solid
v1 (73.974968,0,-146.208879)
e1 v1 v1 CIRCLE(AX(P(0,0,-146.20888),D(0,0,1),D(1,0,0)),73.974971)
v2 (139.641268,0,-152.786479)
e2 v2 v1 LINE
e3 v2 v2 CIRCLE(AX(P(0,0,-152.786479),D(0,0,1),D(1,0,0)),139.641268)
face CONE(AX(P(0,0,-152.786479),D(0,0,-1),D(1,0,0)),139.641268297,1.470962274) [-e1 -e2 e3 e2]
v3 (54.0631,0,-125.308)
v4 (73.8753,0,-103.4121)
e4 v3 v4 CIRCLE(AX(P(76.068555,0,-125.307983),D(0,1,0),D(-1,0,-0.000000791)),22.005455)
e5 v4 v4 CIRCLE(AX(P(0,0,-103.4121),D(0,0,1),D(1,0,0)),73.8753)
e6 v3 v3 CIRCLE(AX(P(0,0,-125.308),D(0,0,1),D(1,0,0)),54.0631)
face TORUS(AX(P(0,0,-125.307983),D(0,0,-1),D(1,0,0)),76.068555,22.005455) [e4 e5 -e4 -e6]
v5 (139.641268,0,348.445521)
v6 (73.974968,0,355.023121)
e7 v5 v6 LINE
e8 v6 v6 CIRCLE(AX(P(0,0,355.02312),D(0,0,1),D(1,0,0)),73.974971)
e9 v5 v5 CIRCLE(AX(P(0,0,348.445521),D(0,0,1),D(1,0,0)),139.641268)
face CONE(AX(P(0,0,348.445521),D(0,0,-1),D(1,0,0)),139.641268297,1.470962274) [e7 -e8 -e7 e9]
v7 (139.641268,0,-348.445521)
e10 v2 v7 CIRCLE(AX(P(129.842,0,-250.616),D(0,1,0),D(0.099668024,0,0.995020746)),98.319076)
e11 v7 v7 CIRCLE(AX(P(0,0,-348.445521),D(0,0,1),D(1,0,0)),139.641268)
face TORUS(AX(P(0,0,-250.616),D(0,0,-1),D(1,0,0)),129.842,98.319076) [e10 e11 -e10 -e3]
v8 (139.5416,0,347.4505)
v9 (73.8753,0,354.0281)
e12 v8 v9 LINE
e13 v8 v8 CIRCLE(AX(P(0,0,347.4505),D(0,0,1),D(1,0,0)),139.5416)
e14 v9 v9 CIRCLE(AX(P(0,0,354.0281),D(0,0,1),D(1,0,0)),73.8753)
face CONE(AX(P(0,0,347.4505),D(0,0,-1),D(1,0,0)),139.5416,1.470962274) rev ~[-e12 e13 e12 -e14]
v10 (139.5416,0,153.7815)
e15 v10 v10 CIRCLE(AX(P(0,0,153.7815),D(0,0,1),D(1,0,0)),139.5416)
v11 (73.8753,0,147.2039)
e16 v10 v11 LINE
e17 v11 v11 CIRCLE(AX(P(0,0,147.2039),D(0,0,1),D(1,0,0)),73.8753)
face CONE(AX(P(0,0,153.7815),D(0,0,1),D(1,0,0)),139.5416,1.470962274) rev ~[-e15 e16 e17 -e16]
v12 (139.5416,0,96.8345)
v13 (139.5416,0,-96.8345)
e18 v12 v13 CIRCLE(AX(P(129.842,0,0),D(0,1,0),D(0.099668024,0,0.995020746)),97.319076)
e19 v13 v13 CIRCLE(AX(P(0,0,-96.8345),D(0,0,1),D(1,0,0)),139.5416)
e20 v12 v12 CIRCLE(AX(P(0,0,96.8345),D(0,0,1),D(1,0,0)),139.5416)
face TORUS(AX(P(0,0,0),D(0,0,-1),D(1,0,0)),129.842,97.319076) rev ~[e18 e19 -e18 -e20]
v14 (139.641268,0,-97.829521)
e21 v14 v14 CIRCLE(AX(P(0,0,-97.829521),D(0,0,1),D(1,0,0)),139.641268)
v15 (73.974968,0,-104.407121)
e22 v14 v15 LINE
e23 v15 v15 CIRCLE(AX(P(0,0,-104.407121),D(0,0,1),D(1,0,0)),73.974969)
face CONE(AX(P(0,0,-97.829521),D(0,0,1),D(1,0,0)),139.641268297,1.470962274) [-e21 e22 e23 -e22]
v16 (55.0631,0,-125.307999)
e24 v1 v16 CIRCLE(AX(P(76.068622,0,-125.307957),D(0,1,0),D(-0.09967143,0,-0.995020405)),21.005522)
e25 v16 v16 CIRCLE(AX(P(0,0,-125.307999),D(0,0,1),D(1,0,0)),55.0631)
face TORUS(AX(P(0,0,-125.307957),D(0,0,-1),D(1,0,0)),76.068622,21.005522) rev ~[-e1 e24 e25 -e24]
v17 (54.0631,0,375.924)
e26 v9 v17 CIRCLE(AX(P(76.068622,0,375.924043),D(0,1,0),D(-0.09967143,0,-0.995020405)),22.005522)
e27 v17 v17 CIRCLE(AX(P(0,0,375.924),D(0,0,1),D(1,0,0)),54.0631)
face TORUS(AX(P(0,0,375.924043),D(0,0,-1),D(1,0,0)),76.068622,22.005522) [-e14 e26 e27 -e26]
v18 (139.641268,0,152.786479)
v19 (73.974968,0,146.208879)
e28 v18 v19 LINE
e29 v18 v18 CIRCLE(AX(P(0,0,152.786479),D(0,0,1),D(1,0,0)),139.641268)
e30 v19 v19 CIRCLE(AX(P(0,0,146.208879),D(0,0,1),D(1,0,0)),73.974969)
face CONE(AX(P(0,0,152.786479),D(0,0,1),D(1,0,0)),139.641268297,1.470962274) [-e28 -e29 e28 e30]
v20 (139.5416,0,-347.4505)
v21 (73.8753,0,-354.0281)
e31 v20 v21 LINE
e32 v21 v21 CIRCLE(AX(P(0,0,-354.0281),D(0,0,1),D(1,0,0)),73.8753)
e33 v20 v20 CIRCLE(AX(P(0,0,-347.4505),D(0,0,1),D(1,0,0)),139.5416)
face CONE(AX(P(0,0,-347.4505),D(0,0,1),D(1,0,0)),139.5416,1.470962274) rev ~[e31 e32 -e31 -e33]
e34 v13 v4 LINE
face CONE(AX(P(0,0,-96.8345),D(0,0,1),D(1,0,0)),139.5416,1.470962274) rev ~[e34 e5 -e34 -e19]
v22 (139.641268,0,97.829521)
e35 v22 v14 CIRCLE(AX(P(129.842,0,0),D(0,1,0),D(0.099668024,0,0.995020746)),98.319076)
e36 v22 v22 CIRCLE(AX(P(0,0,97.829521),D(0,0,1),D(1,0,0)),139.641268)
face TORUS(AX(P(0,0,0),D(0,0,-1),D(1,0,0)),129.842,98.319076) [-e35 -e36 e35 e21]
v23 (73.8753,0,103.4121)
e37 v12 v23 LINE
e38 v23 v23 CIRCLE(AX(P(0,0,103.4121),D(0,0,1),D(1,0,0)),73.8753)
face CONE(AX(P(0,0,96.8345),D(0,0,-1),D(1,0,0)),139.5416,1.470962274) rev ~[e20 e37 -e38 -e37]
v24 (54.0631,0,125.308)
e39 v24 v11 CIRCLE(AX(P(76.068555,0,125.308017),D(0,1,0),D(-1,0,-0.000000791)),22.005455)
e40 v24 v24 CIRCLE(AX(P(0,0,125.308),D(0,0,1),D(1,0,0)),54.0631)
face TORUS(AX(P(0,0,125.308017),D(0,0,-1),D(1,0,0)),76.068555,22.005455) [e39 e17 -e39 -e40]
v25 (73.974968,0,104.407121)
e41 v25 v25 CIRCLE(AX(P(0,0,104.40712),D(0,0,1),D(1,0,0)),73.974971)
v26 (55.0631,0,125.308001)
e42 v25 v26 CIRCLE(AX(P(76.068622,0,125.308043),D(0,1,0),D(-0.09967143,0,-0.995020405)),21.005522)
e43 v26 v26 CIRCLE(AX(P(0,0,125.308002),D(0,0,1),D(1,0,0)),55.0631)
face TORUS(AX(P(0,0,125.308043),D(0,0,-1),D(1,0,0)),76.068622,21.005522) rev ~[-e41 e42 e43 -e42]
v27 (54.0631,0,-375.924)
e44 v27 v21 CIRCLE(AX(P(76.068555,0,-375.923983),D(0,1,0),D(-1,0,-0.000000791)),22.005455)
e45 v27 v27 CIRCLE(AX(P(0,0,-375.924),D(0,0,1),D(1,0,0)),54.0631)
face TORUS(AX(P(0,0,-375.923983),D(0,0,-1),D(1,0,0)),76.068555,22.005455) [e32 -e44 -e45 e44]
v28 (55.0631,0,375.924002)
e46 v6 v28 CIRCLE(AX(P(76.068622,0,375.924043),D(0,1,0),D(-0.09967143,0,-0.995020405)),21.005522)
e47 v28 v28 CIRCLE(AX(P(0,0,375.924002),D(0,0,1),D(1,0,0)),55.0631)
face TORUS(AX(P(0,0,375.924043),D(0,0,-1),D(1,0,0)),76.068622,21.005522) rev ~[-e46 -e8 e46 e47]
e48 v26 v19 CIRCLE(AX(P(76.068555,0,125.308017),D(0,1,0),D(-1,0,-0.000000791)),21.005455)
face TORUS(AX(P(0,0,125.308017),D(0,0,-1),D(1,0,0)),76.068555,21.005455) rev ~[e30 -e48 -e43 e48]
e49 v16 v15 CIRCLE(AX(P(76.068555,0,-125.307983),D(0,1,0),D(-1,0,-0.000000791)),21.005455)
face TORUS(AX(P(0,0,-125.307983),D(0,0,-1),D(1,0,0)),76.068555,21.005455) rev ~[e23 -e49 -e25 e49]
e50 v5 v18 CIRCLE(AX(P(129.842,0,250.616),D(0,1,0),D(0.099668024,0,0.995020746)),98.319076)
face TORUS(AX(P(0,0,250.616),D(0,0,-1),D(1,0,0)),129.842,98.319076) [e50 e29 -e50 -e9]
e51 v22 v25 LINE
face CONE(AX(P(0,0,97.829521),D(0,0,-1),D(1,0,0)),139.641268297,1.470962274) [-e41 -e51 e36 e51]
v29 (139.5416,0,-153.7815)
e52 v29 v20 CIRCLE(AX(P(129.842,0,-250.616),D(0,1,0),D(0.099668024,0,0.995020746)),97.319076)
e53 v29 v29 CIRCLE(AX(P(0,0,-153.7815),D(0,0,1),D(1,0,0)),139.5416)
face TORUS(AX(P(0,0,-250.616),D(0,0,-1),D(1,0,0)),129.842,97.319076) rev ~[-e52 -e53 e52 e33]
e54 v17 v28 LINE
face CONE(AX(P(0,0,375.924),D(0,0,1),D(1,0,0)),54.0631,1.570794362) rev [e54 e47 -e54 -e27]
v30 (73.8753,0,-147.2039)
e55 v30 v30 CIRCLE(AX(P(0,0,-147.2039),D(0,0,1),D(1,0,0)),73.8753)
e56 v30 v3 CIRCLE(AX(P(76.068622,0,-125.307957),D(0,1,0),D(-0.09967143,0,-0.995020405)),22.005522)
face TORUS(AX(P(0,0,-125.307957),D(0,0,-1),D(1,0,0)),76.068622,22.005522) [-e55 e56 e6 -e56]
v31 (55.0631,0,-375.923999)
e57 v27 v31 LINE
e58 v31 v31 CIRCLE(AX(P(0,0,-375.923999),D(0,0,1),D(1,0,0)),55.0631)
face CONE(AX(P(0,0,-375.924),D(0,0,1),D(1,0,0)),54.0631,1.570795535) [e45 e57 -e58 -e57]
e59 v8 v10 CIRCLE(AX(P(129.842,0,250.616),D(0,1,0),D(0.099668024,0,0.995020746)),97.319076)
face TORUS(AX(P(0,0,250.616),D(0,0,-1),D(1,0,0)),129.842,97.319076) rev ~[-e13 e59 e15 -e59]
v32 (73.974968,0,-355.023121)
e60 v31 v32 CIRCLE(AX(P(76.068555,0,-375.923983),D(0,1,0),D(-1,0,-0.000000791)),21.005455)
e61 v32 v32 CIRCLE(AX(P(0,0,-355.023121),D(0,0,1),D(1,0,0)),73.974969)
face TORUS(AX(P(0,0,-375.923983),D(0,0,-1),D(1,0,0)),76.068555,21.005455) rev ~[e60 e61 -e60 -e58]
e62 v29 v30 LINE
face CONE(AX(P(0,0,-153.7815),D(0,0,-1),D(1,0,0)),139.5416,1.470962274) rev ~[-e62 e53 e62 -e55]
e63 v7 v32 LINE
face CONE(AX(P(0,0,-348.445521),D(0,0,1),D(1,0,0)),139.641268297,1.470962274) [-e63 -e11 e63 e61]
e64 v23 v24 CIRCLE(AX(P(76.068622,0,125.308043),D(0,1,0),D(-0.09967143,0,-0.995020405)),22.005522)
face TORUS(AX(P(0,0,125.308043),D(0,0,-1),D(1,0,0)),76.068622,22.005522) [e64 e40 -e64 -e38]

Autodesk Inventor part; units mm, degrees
ref_plane "YZ Plane" through (0, 0, 0) normal (1, 0, 0) x (0, 1, 0)
ref_plane "XZ Plane" through (0, 0, 0) normal (0, 1, 0) x (-1, 0, 0)
ref_plane "XY Plane" through (0, 0, 0) normal (0, 0, 1) x (1, 0, 0)
sketch "Sketch1" plane through (0, 0, 0) normal (0, 1, 0) x (-1, 0, 0)
  arc A0 (-139.5416, 96.8345) -> (-139.5416, -96.8345) centre (-129.842, 0) ccw
  arc A1 (-54.0631, -125.308) -> (-73.8753, -103.4121) centre (-76.0686, -125.308) ccw
  line L0 (-139.5416, -96.8345) -> (-73.8753, -103.4121)
  line L1 (-139.5416, 96.8345) -> (-73.8753, 103.4121)
  arc A2 (-73.8753, 103.4121) -> (-54.0631, 125.308) centre (-76.0686, 125.308) ccw
  line L2 (-54.0631, -125.308) -> (-54.0631, -154.6881) construction
  line L3 (-54.0631, 125.308) -> (-54.0631, 163.9201) construction
  line L4 (0, -218.4097) -> (0, 227.6417) projected
  point P0 (0, 0)
  point P1 (-227.161, 0)
  dimension "d0" = 22.0055
  dimension "d2" = 250.616
  dimension "d3" = 227.161
surface revolve "RevolutionSrf1" sketch "Sketch1" angle 360 about axis through (0, 0, -10) along (0, 0, 1) shown no curves A1 L0 A0 L1 A2
thicken "Thicken1" operation new thickness 1 both sides no extend neighbours no toward (-0.5666588, -0.8236218, -0.0233465) faces at (-128.7428, -187.1239, -2.2721) (-114.3989, 50.251, -98.2961) (21.8674, -66.8564, -104.0607) (-114.3989, 50.251, 98.2961) (21.8674, -66.8564, 104.0607)
pattern_linear "Rectangular Pattern1" count 3 spacing 250.616 along (0, 0, 1) first direction both ways yes
properties part number "Lcavity949"
